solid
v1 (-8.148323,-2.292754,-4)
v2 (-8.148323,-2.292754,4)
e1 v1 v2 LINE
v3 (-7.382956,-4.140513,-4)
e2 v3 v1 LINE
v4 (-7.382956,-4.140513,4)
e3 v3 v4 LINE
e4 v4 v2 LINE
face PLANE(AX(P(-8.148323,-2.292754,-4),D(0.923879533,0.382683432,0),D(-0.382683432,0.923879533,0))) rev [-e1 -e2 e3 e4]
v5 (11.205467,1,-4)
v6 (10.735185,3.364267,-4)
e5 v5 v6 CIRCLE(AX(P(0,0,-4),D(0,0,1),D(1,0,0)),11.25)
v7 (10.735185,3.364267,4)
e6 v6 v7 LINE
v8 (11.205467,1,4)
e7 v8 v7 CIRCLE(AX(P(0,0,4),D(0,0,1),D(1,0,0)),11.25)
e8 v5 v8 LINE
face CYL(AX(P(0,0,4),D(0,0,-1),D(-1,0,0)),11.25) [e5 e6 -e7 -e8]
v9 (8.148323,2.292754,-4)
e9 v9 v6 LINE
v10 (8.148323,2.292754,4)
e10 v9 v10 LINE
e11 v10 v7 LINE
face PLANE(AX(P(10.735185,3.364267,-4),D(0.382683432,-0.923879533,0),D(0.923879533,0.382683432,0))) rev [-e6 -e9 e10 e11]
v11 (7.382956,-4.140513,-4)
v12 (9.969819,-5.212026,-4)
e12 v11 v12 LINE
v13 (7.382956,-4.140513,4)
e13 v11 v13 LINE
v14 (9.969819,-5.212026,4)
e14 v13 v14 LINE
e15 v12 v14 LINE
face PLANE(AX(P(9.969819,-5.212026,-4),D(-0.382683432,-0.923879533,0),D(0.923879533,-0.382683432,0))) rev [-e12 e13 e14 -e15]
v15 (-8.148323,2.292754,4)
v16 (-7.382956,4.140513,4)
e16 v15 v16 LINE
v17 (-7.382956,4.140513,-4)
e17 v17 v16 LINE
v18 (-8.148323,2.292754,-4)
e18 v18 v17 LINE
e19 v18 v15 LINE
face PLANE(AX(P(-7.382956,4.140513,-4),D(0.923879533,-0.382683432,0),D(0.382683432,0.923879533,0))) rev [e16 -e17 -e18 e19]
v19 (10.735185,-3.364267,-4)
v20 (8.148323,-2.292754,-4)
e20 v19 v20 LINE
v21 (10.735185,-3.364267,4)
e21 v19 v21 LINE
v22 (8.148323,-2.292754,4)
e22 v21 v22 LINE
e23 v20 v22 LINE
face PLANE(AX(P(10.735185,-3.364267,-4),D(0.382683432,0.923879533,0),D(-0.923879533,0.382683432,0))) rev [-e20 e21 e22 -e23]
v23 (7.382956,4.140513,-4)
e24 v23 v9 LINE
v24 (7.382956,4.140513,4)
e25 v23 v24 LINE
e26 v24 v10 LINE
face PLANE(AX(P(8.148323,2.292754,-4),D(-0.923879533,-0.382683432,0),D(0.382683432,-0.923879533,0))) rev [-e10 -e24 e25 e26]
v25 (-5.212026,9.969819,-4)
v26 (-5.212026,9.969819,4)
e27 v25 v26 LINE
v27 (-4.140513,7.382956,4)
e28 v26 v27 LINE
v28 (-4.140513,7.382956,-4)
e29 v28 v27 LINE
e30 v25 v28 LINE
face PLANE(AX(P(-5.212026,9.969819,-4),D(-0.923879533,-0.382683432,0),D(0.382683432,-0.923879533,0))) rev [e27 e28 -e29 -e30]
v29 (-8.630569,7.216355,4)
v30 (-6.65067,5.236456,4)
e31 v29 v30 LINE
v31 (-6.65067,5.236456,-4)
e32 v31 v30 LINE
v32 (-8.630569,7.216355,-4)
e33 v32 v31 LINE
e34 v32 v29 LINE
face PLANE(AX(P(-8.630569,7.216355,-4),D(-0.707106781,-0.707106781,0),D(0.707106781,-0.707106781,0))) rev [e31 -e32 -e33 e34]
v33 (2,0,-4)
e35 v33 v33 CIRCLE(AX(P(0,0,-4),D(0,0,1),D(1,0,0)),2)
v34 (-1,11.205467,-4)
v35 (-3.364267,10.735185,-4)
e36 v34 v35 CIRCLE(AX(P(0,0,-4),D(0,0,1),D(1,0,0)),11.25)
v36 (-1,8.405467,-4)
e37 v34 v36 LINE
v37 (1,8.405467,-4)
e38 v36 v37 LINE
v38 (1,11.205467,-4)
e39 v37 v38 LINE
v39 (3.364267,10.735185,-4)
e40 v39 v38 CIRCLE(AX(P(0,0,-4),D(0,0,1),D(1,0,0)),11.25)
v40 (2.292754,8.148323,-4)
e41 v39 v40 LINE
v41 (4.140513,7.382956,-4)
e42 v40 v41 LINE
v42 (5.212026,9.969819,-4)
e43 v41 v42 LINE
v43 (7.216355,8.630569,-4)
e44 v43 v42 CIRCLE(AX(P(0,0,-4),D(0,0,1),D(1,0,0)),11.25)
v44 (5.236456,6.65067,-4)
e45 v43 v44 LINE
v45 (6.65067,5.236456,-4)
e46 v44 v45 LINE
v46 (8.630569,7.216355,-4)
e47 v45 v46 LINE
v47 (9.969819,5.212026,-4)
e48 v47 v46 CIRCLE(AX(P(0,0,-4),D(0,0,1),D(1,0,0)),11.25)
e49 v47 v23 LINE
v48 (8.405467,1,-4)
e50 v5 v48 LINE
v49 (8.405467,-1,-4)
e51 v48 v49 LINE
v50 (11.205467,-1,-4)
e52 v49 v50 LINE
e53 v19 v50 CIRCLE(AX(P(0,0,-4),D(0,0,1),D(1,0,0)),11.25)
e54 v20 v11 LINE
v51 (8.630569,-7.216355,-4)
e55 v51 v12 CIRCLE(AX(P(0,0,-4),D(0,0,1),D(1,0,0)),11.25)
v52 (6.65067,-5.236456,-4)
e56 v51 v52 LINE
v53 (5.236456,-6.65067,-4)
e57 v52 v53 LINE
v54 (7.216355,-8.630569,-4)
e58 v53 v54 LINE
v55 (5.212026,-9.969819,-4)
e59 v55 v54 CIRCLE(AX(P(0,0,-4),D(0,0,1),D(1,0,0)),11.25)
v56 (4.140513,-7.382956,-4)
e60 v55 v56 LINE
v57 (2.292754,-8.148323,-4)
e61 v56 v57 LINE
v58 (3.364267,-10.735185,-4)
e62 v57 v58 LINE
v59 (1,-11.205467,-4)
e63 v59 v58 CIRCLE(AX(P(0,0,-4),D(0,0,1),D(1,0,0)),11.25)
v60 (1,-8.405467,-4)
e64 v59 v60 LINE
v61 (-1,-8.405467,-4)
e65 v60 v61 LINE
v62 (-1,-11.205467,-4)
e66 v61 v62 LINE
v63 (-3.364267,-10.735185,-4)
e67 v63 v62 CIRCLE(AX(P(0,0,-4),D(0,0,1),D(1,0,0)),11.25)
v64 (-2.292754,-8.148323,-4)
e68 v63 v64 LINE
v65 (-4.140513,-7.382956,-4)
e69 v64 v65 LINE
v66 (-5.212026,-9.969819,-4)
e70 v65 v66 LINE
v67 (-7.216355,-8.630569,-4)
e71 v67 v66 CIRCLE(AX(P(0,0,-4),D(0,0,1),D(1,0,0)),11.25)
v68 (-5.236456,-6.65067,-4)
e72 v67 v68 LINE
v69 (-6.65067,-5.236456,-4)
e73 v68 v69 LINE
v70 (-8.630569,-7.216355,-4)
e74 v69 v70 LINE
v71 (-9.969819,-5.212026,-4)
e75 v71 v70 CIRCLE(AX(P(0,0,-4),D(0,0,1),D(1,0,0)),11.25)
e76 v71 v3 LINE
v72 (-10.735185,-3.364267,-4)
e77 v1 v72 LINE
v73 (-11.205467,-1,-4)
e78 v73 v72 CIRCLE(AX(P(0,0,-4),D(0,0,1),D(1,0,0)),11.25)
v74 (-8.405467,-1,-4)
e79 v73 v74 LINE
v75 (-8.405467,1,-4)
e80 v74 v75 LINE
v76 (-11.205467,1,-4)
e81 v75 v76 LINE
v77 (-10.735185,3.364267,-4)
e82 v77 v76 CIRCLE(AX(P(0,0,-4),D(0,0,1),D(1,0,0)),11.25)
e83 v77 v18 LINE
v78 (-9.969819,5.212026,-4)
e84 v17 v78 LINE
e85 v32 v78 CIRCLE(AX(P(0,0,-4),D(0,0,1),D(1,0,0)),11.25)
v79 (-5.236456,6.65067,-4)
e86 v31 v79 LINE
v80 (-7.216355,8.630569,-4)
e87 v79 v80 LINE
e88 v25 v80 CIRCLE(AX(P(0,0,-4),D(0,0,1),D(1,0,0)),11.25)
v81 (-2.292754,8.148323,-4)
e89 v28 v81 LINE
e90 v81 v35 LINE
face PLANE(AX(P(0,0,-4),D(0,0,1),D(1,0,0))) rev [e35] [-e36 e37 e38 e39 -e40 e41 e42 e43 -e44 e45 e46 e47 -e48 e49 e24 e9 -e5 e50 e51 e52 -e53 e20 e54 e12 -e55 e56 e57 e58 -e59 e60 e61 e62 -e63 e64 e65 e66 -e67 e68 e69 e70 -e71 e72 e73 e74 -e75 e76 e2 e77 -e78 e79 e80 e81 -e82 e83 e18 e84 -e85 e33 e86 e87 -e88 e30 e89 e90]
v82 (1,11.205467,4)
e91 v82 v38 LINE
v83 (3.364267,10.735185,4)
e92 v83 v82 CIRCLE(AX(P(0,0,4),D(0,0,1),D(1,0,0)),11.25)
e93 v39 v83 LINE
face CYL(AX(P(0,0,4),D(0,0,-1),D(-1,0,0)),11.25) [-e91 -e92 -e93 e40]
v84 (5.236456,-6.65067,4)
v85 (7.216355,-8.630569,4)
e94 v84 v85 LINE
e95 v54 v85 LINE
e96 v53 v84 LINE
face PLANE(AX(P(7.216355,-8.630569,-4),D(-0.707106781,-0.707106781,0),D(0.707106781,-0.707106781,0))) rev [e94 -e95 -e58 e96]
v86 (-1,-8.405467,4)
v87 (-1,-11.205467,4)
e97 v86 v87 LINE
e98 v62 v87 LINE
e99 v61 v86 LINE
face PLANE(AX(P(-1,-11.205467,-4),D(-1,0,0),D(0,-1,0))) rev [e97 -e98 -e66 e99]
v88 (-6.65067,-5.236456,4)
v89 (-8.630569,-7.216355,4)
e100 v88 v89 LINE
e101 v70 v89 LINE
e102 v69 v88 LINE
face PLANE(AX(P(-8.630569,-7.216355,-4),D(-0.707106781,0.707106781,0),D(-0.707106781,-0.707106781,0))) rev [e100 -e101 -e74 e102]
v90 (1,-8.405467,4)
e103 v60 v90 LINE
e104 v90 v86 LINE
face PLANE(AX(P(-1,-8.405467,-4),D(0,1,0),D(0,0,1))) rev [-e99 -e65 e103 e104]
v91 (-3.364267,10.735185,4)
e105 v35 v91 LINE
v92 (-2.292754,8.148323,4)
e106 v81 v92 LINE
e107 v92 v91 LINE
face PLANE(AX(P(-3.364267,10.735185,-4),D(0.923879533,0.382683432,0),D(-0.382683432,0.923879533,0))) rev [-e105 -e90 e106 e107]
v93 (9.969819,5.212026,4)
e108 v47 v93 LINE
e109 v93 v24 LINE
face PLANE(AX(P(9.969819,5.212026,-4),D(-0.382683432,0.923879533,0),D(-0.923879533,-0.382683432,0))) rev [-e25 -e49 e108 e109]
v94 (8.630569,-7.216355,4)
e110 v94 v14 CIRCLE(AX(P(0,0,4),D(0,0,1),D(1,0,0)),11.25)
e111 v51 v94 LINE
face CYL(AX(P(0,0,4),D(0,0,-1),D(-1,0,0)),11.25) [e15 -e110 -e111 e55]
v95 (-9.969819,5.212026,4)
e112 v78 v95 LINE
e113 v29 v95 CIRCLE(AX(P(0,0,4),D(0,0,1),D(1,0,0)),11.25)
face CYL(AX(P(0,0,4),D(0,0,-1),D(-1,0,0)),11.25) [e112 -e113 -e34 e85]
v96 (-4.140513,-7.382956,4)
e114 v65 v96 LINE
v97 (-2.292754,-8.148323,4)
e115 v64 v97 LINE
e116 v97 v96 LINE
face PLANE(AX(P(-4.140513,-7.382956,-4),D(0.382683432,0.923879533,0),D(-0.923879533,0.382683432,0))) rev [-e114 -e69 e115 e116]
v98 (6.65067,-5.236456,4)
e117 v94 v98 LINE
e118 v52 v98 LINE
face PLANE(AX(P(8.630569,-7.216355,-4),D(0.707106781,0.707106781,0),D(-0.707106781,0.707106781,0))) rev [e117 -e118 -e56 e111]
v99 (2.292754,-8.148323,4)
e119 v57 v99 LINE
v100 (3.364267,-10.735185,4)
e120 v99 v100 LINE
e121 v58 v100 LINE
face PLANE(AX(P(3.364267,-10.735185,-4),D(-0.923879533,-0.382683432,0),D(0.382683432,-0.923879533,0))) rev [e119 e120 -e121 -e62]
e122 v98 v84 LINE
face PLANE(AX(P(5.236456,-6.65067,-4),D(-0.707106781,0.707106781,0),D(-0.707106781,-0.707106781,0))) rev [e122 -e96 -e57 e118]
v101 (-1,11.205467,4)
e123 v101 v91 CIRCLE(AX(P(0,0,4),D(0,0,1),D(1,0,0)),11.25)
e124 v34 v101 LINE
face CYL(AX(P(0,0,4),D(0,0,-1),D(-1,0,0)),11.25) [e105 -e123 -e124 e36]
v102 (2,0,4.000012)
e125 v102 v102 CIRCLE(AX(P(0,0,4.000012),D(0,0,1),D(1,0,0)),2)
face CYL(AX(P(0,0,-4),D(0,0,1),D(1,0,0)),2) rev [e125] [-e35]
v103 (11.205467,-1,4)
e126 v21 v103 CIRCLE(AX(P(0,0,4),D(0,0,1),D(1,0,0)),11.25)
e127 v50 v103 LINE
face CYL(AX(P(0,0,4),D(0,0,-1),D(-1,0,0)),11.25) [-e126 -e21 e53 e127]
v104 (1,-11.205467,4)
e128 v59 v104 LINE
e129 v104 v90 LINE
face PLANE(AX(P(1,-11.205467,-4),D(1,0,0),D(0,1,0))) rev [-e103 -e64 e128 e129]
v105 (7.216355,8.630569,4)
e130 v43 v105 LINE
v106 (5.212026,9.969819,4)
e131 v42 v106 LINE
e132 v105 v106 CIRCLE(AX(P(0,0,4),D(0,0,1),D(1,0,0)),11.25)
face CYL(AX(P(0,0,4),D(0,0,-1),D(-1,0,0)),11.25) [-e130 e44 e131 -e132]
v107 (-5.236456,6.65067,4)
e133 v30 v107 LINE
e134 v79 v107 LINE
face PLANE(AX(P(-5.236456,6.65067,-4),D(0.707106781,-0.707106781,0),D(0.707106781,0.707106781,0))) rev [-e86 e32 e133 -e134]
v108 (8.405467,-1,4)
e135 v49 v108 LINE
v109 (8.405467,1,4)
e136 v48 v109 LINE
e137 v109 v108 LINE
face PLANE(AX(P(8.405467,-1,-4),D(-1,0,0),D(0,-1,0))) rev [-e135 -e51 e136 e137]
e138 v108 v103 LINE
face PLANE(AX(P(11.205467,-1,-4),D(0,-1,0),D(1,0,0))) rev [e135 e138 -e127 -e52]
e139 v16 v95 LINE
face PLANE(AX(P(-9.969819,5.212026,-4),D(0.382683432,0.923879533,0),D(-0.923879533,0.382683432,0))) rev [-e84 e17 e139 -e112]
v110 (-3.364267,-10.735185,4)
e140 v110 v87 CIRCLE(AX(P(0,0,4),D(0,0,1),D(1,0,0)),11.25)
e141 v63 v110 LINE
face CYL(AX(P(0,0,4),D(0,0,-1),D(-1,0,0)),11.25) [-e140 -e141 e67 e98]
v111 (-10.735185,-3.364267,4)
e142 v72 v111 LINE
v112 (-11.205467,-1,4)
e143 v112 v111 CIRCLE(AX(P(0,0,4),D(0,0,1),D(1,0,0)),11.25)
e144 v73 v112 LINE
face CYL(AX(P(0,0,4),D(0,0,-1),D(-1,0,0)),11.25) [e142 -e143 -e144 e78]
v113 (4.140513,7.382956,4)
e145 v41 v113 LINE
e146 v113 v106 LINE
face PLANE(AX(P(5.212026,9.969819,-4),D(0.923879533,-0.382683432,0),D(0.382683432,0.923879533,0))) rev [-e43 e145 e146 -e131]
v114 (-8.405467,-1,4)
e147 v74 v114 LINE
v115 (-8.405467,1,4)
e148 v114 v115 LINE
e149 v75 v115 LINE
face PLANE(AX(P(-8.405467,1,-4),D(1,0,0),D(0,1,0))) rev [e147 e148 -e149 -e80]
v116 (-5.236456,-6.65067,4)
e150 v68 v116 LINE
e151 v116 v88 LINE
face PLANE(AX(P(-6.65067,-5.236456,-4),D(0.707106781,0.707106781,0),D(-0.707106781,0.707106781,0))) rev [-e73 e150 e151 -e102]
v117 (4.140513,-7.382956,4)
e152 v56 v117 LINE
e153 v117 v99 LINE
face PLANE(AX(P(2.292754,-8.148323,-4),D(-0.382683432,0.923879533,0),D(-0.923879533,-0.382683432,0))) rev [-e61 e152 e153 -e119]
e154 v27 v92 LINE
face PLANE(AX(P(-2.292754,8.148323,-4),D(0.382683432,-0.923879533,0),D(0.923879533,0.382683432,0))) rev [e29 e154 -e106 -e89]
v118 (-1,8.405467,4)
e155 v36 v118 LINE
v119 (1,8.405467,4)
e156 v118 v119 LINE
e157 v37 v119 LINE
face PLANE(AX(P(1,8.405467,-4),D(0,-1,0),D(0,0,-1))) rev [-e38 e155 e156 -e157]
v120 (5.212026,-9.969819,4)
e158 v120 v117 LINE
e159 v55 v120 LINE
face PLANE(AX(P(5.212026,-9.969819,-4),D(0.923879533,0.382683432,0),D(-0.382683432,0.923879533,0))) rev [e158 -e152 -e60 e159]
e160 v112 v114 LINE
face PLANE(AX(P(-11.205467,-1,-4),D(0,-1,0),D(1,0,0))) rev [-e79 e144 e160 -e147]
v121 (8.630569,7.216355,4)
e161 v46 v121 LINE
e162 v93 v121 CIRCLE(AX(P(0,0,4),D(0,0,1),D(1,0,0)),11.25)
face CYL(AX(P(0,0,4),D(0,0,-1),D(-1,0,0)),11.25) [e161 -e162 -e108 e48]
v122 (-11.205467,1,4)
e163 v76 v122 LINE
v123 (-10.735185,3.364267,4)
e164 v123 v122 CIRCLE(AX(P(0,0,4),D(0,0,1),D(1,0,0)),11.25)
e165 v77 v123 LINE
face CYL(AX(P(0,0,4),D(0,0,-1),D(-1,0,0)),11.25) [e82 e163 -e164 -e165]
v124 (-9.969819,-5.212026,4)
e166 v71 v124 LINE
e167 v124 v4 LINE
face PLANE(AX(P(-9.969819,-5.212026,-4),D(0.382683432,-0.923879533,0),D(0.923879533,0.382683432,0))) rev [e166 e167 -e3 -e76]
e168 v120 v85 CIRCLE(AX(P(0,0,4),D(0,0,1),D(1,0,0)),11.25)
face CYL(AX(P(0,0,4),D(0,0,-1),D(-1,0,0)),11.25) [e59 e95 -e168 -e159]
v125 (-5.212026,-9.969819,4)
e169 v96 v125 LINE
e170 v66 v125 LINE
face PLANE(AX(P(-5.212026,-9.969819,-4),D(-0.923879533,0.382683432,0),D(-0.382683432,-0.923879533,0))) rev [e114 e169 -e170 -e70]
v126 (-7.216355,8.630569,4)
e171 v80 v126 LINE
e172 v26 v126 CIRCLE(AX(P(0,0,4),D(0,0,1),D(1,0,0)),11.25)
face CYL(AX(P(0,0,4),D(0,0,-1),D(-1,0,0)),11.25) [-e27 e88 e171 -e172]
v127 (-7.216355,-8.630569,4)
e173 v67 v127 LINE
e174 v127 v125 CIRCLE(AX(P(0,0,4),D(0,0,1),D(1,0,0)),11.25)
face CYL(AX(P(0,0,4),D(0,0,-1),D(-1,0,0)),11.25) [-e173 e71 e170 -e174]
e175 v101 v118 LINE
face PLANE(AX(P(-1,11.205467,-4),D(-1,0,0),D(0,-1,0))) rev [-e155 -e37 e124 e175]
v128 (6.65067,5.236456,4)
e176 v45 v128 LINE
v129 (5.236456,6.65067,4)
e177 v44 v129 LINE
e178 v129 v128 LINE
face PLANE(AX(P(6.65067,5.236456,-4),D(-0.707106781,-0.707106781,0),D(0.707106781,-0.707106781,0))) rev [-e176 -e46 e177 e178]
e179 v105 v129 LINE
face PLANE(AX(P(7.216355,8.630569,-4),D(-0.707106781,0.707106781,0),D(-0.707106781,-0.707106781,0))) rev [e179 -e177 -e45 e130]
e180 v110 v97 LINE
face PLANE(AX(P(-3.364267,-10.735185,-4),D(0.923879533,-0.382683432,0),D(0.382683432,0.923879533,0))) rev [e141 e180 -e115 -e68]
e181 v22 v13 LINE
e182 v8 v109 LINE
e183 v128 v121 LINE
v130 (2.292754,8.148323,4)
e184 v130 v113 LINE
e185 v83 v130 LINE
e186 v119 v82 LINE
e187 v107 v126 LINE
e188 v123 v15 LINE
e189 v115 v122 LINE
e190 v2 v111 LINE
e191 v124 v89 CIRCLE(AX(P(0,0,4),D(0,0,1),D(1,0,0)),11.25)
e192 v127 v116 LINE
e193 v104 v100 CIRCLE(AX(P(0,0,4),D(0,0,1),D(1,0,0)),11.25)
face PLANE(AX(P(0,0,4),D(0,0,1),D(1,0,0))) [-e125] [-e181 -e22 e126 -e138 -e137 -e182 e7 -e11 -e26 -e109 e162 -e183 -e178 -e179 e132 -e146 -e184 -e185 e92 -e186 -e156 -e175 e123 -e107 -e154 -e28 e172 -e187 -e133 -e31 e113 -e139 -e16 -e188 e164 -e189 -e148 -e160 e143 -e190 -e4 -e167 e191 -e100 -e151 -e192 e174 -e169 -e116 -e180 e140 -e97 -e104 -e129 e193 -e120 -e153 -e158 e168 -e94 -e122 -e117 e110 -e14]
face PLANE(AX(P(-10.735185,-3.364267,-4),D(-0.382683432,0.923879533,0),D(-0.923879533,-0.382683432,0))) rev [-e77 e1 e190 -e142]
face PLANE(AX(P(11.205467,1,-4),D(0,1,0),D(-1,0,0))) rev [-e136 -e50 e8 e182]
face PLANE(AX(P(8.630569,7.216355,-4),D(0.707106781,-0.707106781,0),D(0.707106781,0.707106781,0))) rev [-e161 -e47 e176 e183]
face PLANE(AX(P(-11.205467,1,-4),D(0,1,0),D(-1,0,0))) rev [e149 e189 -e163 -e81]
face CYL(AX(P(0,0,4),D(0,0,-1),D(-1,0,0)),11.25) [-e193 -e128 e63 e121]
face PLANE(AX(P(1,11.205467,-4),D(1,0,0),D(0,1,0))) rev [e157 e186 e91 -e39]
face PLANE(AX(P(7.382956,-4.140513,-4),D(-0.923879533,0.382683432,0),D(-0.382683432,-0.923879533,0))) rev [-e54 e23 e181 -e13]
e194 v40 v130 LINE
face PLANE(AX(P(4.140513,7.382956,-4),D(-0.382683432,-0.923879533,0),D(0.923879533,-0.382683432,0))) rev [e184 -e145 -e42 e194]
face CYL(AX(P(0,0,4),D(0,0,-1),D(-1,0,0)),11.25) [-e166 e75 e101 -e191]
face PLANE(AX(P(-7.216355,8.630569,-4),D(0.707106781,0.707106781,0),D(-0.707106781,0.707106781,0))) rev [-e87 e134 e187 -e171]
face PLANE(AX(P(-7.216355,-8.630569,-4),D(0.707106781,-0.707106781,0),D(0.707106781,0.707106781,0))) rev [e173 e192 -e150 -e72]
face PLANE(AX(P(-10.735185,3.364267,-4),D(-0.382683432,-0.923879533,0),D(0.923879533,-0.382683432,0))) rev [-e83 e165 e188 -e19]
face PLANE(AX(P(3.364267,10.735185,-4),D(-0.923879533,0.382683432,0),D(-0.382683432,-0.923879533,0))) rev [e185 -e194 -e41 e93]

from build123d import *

# Parameters (mm, degrees)
SKETCH1_R               = 11.25
BOSS_EXTRUDE1_DEPTH     = 4
SKETCH2_W               = 2
SKETCH2_H               = 2.8
CUT_EXTRUDE2_DEPTH      = 18.808003819
CIRPATTERN1_START       = -4
CIRPATTERN1_DEPTH       = 8
CUT_EXTRUDE3_DEPTH      = 18.751760477
CUT_EXTRUDE3_DEPTH_BACK = 18.751760477
SKETCH4_R               = 2


# Read off the part's stored shape, not the designer's step: CirPattern1
with BuildPart() as part:
    # Sketch1 → Boss-Extrude1 (new, symmetric)
    with BuildSketch(Plane.XY):
        Circle(SKETCH1_R)
    extrude(amount=BOSS_EXTRUDE1_DEPTH, both=True)

    # Sketch2 → Cut-Extrude2 (cut, symmetric)
    with BuildSketch(Plane.XY.offset(4)):
        with Locations((0, 9.805467416)):
            Rectangle(SKETCH2_W, SKETCH2_H)
    extrude(amount=CUT_EXTRUDE2_DEPTH, both=True, mode=Mode.SUBTRACT)


with BuildPart() as cut_extrude2_kept_piece:
    # of the separate pieces the step leaves, the one the design keeps (cut_extrude2_pieces_kept)
    add(part.part.solids().sort_by_distance((1, 8.405467416, 4))[0])

    # CirPattern1 outline → CirPattern1 (cut)
    with BuildSketch(Plane.XY.offset(CIRPATTERN1_START)):
        with BuildLine():
            Line((1, -8.405467416), (-1, -8.405467416))
            Line((-1, -8.405467416), (-1, -11.205467416))
            ThreePointArc((-1, -11.205467416), (0, -11.25), (1, -11.205467416))
            Line((1, -11.205467416), (1, -8.405467416))
        make_face()
        with BuildLine():
            Line((4.140512654, 7.382955874), (5.212026264, 9.969818566))
            ThreePointArc((5.212026264, 9.969818566), (4.305188614, 10.393644741), (3.364267199, 10.73518543))
            Line((3.364267199, 10.73518543), (2.292753589, 8.148322739))
            Line((2.292753589, 8.148322739), (4.140512654, 7.382955874))
        make_face()
        with BuildLine():
            Line((6.65066979, 5.236456227), (8.630568777, 7.216355215))
            ThreePointArc((8.630568777, 7.216355215), (7.954951289, 7.954951289), (7.216355215, 8.630568777))
            Line((7.216355215, 8.630568777), (5.236456227, 6.65066979))
            Line((5.236456227, 6.65066979), (6.65066979, 5.236456227))
        make_face()
        with BuildLine():
            Line((8.148322739, 2.292753589), (10.73518543, 3.364267199))
            ThreePointArc((10.73518543, 3.364267199), (10.393644741, 4.305188614), (9.969818565, 5.212026264))
            Line((9.969818565, 5.212026264), (7.382955874, 4.140512654))
            Line((7.382955874, 4.140512654), (8.148322739, 2.292753589))
        make_face()
        with BuildLine():
            Line((8.405467416, -1), (11.205467416, -1))
            ThreePointArc((11.205467416, -1), (11.25, 0), (11.205467416, 1))
            Line((11.205467416, 1), (8.405467416, 1))
            Line((8.405467416, 1), (8.405467416, -1))
        make_face()
        with BuildLine():
            Line((7.382955874, -4.140512654), (9.969818565, -5.212026264))
            ThreePointArc((9.969818565, -5.212026264), (10.393644741, -4.305188614), (10.73518543, -3.364267199))
            Line((10.73518543, -3.364267199), (8.148322739, -2.292753589))
            Line((8.148322739, -2.292753589), (7.382955874, -4.140512654))
        make_face()
        with BuildLine():
            Line((5.236456227, -6.65066979), (7.216355215, -8.630568777))
            ThreePointArc((7.216355215, -8.630568777), (7.954951288, -7.954951288), (8.630568777, -7.216355215))
            Line((8.630568777, -7.216355215), (6.65066979, -5.236456227))
            Line((6.65066979, -5.236456227), (5.236456227, -6.65066979))
        make_face()
        with BuildLine():
            Line((2.292753589, -8.148322739), (3.364267199, -10.73518543))
            ThreePointArc((3.364267199, -10.73518543), (4.305188614, -10.393644741), (5.212026264, -9.969818565))
            Line((5.212026264, -9.969818565), (4.140512654, -7.382955874))
            Line((4.140512654, -7.382955874), (2.292753589, -8.148322739))
        make_face()
        with BuildLine():
            ThreePointArc((-3.364267199, 10.73518543), (-4.305188614, 10.393644741), (-5.212026264, 9.969818566))
            Line((-5.212026264, 9.969818566), (-4.140512654, 7.382955874))
            Line((-4.140512654, 7.382955874), (-2.292753589, 8.148322739))
            Line((-2.292753589, 8.148322739), (-3.364267199, 10.73518543))
        make_face()
        with BuildLine():
            ThreePointArc((-7.216355215, 8.630568777), (-7.954951289, 7.954951289), (-8.630568777, 7.216355215))
            Line((-8.630568777, 7.216355215), (-6.65066979, 5.236456227))
            Line((-6.65066979, 5.236456227), (-5.236456227, 6.65066979))
            Line((-5.236456227, 6.65066979), (-7.216355215, 8.630568777))
        make_face()
        with BuildLine():
            ThreePointArc((-9.969818565, 5.212026264), (-10.393644741, 4.305188614), (-10.73518543, 3.364267199))
            Line((-10.73518543, 3.364267199), (-8.148322739, 2.292753589))
            Line((-8.148322739, 2.292753589), (-7.382955874, 4.140512654))
            Line((-7.382955874, 4.140512654), (-9.969818565, 5.212026264))
        make_face()
        with BuildLine():
            ThreePointArc((-11.205467416, 1), (-11.25, 0), (-11.205467416, -1))
            Line((-11.205467416, -1), (-8.405467416, -1))
            Line((-8.405467416, -1), (-8.405467416, 1))
            Line((-8.405467416, 1), (-11.205467416, 1))
        make_face()
        with BuildLine():
            ThreePointArc((-10.73518543, -3.364267199), (-10.393644741, -4.305188614), (-9.969818565, -5.212026264))
            Line((-9.969818565, -5.212026264), (-7.382955874, -4.140512654))
            Line((-7.382955874, -4.140512654), (-8.148322739, -2.292753589))
            Line((-8.148322739, -2.292753589), (-10.73518543, -3.364267199))
        make_face()
        with BuildLine():
            ThreePointArc((-8.630568777, -7.216355215), (-7.954951288, -7.954951288), (-7.216355215, -8.630568777))
            Line((-7.216355215, -8.630568777), (-5.236456227, -6.65066979))
            Line((-5.236456227, -6.65066979), (-6.65066979, -5.236456227))
            Line((-6.65066979, -5.236456227), (-8.630568777, -7.216355215))
        make_face()
        with BuildLine():
            ThreePointArc((-5.212026264, -9.969818565), (-4.305188614, -10.393644741), (-3.364267199, -10.73518543))
            Line((-3.364267199, -10.73518543), (-2.292753589, -8.148322739))
            Line((-2.292753589, -8.148322739), (-4.140512654, -7.382955874))
            Line((-4.140512654, -7.382955874), (-5.212026264, -9.969818565))
        make_face()
    extrude(amount=CIRPATTERN1_DEPTH, mode=Mode.SUBTRACT)

    # Sketch4 → Cut-Extrude3 (cut, two sides: drawn at the far end of the back side and taken through both)
    with BuildSketch(Plane.XY.offset(4).offset(-CUT_EXTRUDE3_DEPTH_BACK)):
        Circle(SKETCH4_R)
    extrude(amount=CUT_EXTRUDE3_DEPTH + CUT_EXTRUDE3_DEPTH_BACK, mode=Mode.SUBTRACT)


solid = cut_extrude2_kept_piece.part
